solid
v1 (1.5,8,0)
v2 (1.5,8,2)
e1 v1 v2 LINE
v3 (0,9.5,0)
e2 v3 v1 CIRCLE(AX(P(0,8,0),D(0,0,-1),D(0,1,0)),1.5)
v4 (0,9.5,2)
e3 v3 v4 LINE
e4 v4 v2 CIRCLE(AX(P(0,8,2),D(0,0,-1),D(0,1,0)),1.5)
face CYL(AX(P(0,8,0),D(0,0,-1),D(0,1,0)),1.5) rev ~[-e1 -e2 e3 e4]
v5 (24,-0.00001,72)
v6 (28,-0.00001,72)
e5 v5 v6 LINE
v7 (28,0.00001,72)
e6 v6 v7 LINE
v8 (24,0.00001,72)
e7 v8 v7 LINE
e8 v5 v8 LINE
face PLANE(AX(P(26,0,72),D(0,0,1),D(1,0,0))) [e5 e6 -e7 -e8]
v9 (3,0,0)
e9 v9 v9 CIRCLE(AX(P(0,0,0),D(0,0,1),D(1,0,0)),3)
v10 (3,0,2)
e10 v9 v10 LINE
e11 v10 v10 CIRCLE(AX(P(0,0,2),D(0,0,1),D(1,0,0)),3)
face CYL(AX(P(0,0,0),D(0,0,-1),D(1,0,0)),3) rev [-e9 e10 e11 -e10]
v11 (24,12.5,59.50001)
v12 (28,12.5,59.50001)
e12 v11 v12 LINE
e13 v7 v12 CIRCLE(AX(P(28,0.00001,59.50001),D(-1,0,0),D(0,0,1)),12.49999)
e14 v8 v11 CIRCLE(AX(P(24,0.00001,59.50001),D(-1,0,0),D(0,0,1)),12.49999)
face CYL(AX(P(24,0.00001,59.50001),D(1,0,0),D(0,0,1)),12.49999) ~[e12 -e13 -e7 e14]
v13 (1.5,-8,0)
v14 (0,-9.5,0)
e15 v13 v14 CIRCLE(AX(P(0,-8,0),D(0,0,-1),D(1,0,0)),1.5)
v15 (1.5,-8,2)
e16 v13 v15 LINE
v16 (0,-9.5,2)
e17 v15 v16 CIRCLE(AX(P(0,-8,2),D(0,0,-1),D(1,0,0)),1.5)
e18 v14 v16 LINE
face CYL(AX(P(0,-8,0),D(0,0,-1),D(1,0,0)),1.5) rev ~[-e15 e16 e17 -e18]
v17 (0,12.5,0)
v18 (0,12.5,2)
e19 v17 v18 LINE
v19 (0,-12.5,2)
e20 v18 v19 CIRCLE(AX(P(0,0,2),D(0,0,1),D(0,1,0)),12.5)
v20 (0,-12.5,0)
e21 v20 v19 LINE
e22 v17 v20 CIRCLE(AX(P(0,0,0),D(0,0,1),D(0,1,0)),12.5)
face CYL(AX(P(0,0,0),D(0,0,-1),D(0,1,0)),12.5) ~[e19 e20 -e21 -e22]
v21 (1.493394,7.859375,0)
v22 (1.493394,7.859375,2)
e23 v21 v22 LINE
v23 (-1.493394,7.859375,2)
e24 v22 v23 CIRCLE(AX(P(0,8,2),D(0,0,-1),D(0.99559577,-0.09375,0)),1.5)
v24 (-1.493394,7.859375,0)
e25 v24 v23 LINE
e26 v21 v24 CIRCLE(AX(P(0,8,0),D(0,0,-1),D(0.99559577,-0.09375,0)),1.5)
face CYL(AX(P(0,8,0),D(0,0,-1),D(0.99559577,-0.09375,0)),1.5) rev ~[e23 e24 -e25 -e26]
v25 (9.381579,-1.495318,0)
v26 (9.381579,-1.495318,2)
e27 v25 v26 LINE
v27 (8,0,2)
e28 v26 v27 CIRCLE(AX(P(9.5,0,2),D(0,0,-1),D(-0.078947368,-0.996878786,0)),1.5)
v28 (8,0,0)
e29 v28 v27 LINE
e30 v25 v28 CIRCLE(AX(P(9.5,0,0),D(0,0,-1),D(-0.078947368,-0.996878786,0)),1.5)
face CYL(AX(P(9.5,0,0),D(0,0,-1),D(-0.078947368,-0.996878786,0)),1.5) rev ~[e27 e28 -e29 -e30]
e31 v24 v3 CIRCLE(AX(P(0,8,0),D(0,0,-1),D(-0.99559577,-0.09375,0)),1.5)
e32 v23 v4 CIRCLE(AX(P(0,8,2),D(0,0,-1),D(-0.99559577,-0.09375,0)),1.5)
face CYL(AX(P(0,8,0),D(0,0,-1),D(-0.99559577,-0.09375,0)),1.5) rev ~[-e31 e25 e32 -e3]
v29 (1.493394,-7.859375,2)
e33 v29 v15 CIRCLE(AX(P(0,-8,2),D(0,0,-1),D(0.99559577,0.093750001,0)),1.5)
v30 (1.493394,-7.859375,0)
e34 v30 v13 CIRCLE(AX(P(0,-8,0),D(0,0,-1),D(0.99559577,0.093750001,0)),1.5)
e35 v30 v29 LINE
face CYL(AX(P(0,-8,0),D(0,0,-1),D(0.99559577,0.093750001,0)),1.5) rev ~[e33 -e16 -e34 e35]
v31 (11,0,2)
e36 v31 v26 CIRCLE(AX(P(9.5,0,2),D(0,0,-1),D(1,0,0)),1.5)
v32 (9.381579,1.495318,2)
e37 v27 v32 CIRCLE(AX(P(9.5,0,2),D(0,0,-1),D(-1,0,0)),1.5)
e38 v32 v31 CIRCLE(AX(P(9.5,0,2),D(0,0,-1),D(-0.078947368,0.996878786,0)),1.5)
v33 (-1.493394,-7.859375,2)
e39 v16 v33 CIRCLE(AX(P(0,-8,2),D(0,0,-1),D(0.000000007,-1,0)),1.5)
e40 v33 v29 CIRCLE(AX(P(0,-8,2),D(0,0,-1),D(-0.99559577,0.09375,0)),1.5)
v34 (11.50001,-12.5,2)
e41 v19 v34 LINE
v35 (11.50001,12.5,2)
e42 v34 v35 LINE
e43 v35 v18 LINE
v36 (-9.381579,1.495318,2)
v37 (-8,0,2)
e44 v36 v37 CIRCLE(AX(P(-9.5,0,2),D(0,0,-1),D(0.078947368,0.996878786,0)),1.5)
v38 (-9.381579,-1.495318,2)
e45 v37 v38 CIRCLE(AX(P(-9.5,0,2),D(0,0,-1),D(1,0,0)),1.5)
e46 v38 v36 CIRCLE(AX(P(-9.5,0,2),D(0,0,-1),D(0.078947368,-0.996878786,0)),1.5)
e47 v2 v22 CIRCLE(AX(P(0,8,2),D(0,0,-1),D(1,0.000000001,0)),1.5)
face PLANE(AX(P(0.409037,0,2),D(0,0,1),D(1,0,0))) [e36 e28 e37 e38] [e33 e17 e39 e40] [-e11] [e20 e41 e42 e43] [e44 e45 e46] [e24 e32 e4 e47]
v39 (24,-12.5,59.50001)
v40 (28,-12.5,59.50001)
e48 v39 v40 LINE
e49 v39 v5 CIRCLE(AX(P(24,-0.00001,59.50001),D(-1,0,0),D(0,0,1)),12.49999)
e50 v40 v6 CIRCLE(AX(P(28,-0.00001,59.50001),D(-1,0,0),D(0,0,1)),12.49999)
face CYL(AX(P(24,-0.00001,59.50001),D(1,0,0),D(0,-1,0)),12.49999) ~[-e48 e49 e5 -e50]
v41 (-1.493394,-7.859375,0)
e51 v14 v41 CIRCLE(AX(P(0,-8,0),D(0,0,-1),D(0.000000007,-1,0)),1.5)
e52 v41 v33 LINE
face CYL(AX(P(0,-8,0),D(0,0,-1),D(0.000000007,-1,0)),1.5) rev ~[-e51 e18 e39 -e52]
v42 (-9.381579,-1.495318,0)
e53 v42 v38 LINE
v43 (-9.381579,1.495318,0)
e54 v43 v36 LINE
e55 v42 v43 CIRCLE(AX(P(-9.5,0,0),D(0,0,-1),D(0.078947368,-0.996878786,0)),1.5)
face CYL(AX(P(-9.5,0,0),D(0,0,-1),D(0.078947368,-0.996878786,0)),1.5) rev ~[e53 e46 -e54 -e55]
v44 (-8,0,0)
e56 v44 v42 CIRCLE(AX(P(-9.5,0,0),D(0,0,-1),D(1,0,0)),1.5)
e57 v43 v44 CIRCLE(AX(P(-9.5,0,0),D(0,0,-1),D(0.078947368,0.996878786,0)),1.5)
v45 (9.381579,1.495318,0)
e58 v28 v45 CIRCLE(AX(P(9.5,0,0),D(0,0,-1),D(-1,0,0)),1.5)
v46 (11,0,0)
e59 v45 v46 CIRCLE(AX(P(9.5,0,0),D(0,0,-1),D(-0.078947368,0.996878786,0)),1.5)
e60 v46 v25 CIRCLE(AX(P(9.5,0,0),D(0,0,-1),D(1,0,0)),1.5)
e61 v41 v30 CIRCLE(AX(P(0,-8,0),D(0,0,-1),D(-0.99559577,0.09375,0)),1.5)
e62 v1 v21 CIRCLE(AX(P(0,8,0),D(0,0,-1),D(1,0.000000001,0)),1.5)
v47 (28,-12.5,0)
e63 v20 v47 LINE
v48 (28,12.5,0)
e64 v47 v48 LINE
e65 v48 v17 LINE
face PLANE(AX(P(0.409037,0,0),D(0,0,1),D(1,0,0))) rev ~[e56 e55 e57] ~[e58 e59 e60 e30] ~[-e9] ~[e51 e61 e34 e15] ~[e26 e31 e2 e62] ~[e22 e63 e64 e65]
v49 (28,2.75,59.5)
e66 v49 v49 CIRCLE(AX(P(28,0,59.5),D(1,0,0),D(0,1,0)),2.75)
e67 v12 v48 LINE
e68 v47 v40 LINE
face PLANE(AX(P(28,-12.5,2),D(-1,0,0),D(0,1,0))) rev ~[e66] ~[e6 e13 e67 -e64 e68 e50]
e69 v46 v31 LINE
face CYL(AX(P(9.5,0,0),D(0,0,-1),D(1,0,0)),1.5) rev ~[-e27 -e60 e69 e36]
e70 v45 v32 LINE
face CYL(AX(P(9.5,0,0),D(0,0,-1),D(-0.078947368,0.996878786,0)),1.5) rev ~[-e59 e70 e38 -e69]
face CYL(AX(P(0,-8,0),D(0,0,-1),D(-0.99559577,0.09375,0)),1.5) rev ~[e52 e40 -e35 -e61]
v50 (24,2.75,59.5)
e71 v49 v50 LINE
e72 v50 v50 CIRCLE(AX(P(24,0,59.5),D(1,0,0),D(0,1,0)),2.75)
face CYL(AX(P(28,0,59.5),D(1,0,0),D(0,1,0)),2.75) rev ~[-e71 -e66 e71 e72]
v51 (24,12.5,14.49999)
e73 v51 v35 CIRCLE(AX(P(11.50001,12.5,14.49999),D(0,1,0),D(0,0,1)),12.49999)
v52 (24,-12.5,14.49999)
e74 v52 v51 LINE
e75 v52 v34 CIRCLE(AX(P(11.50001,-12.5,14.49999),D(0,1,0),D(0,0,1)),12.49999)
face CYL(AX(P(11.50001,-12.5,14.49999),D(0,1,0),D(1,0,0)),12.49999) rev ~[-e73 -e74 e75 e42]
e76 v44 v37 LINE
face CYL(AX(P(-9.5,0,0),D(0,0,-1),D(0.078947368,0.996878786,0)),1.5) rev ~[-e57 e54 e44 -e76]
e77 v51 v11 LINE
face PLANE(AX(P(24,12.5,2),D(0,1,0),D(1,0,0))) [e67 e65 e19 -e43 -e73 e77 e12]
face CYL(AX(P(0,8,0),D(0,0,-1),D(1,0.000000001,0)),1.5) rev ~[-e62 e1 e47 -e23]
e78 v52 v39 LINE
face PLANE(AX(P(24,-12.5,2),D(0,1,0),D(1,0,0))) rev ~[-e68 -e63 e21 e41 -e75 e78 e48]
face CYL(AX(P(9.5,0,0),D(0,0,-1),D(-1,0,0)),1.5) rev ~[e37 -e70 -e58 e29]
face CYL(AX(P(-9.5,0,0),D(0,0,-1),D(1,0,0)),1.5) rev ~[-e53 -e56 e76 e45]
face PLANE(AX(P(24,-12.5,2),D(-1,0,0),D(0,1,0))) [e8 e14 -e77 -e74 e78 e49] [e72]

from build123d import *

# Parameters (mm, degrees)
F0_R     = 3
F1_DEPTH = 2
F2_W     = 4
F2_H     = 25
F3_DEPTH = 70
F4_R     = 2.75
F5_DEPTH = 40.501
F6_R     = 12.49999


# Not quite as in the source:
# - a fillet or chamfer is up to 0.001 mm smaller than in the source, because OpenCascade refuses the exact size


with BuildPart() as f1:
    # F0 (on Top) → F1 (new body)
    with BuildSketch(Plane.XY):
        with BuildLine():
            ThreePointArc((0, -12.5), (8.8388347648, -8.8388347648), (12.5, 0))
            ThreePointArc((12.5, 0), (8.8388347648, 8.8388347648), (0, 12.5))
            ThreePointArc((0, 12.5), (-12.5, 0), (0, -12.5))
        make_face()
        with BuildLine():
            ThreePointArc((0, 9.5), (6.1662175321, 7.2268777039), (9.3815789474, 1.4953181783))
            ThreePointArc((9.3815789474, 1.4953181783), (10.5179313388, 1.1017330845), (11, 0))
            ThreePointArc((11, 0), (10.5179313388, -1.1017330845), (9.3815789474, -1.4953181783))
            ThreePointArc((9.3815789474, -1.4953181783), (6.1662175364, -7.2268777002), (1.13e-08, -9.5))
            ThreePointArc((1.13e-08, -9.5), (-6.1662175278, -7.2268777076), (-9.3815789474, -1.4953181783))
            ThreePointArc((-9.3815789474, -1.4953181783), (-11, 0), (-9.3815789474, 1.4953181783))
            ThreePointArc((-9.3815789474, 1.4953181783), (-6.1662175321, 7.2268777039), (0, 9.5))
        make_face(mode=Mode.SUBTRACT)
        with BuildLine():
            ThreePointArc((1.4933936552, -7.859375), (6.1622702489, -5.1016100771), (8, 0))
            ThreePointArc((8, 0), (6.1622702489, 5.1016100771), (1.4933936552, 7.859375))
            ThreePointArc((1.4933936552, 7.859375), (0, 6.5), (-1.4933936552, 7.859375))
            ThreePointArc((-1.4933936552, 7.859375), (-6.1622702489, 5.1016100771), (-8, 0))
            ThreePointArc((-8, 0), (-6.1622702489, -5.1016100771), (-1.4933936552, -7.859375))
            ThreePointArc((-1.4933936552, -7.859375), (0, -6.5), (1.4933936552, -7.859375))
        make_face()
        Circle(F0_R, mode=Mode.SUBTRACT)
        with BuildLine():
            ThreePointArc((0, 12.5), (8.8388347648, 8.8388347648), (12.5, 0))
            ThreePointArc((12.5, 0), (8.8388347648, -8.8388347648), (0, -12.5))
            Line((0, -12.5), (28, -12.5))
            Line((28, -12.5), (28, 12.5))
            Line((28, 12.5), (0, 12.5))
        make_face()
        with BuildLine():
            ThreePointArc((-1.4933936552, 7.859375), (-1.1092649593, 9.0097184013), (0, 9.5))
            ThreePointArc((0, 9.5), (-6.1662175321, 7.2268777039), (-9.3815789474, 1.4953181783))
            ThreePointArc((-9.3815789474, 1.4953181783), (-8.3982669155, 1.0179313388), (-8, 0))
            ThreePointArc((-8, 0), (-6.1622702489, 5.1016100771), (-1.4933936552, 7.859375))
        make_face()
        with BuildLine():
            ThreePointArc((8, 0), (8.3982669155, 1.0179313388), (9.3815789474, 1.4953181783))
            ThreePointArc((9.3815789474, 1.4953181783), (6.1662175321, 7.2268777039), (0, 9.5))
            ThreePointArc((0, 9.5), (1.0606601718, 9.0606601718), (1.5, 8))
            ThreePointArc((1.5, 8), (1.4983475036, 7.9296099538), (1.4933936552, 7.859375))
            ThreePointArc((1.4933936552, 7.859375), (6.1622702489, 5.1016100771), (8, 0))
        make_face()
        with BuildLine():
            ThreePointArc((1.13e-08, -9.5), (6.1662175364, -7.2268777002), (9.3815789474, -1.4953181783))
            ThreePointArc((9.3815789474, -1.4953181783), (8.3982669155, -1.0179313388), (8, 0))
            ThreePointArc((8, 0), (6.1622702489, -5.1016100771), (1.4933936552, -7.859375))
            ThreePointArc((1.4933936552, -7.859375), (1.4983475036, -7.9296099538), (1.5, -8))
            ThreePointArc((1.5, -8), (1.0606601758, -9.0606601678), (1.13e-08, -9.5))
        make_face()
        with BuildLine():
            ThreePointArc((-9.3815789474, -1.4953181783), (-6.1662175278, -7.2268777076), (1.13e-08, -9.5))
            ThreePointArc((1.13e-08, -9.5), (-1.1092649555, -9.0097184055), (-1.4933936552, -7.859375))
            ThreePointArc((-1.4933936552, -7.859375), (-6.1622702489, -5.1016100771), (-8, 0))
            ThreePointArc((-8, 0), (-8.3982669155, -1.0179313388), (-9.3815789474, -1.4953181783))
        make_face()
    extrude(amount=F1_DEPTH)

    # F2 (on face) → F3 (join)
    with BuildSketch(Plane.XY.offset(2)):
        with Locations((26, 0)):
            Rectangle(F2_W, F2_H)
    extrude(amount=F3_DEPTH)

    # F4 (on face) → F5 (cut, through all)
    with BuildSketch(Plane.YZ.offset(28)):
        with Locations((0, 59.5)):
            Circle(F4_R)
    extrude(amount=-F5_DEPTH, mode=Mode.SUBTRACT)

    # F6 (radius 12.5 in the source; OpenCascade refuses exactly that, so slightly less here)
    f6_edges = [f1.edges().sort_by_distance(p)[0] for p in [
        (24, 0, 2),
        (26, -12.5, 72),
        (26, 12.5, 72),
    ]]
    fillet(f6_edges, radius=F6_R)


solid = f1.part
